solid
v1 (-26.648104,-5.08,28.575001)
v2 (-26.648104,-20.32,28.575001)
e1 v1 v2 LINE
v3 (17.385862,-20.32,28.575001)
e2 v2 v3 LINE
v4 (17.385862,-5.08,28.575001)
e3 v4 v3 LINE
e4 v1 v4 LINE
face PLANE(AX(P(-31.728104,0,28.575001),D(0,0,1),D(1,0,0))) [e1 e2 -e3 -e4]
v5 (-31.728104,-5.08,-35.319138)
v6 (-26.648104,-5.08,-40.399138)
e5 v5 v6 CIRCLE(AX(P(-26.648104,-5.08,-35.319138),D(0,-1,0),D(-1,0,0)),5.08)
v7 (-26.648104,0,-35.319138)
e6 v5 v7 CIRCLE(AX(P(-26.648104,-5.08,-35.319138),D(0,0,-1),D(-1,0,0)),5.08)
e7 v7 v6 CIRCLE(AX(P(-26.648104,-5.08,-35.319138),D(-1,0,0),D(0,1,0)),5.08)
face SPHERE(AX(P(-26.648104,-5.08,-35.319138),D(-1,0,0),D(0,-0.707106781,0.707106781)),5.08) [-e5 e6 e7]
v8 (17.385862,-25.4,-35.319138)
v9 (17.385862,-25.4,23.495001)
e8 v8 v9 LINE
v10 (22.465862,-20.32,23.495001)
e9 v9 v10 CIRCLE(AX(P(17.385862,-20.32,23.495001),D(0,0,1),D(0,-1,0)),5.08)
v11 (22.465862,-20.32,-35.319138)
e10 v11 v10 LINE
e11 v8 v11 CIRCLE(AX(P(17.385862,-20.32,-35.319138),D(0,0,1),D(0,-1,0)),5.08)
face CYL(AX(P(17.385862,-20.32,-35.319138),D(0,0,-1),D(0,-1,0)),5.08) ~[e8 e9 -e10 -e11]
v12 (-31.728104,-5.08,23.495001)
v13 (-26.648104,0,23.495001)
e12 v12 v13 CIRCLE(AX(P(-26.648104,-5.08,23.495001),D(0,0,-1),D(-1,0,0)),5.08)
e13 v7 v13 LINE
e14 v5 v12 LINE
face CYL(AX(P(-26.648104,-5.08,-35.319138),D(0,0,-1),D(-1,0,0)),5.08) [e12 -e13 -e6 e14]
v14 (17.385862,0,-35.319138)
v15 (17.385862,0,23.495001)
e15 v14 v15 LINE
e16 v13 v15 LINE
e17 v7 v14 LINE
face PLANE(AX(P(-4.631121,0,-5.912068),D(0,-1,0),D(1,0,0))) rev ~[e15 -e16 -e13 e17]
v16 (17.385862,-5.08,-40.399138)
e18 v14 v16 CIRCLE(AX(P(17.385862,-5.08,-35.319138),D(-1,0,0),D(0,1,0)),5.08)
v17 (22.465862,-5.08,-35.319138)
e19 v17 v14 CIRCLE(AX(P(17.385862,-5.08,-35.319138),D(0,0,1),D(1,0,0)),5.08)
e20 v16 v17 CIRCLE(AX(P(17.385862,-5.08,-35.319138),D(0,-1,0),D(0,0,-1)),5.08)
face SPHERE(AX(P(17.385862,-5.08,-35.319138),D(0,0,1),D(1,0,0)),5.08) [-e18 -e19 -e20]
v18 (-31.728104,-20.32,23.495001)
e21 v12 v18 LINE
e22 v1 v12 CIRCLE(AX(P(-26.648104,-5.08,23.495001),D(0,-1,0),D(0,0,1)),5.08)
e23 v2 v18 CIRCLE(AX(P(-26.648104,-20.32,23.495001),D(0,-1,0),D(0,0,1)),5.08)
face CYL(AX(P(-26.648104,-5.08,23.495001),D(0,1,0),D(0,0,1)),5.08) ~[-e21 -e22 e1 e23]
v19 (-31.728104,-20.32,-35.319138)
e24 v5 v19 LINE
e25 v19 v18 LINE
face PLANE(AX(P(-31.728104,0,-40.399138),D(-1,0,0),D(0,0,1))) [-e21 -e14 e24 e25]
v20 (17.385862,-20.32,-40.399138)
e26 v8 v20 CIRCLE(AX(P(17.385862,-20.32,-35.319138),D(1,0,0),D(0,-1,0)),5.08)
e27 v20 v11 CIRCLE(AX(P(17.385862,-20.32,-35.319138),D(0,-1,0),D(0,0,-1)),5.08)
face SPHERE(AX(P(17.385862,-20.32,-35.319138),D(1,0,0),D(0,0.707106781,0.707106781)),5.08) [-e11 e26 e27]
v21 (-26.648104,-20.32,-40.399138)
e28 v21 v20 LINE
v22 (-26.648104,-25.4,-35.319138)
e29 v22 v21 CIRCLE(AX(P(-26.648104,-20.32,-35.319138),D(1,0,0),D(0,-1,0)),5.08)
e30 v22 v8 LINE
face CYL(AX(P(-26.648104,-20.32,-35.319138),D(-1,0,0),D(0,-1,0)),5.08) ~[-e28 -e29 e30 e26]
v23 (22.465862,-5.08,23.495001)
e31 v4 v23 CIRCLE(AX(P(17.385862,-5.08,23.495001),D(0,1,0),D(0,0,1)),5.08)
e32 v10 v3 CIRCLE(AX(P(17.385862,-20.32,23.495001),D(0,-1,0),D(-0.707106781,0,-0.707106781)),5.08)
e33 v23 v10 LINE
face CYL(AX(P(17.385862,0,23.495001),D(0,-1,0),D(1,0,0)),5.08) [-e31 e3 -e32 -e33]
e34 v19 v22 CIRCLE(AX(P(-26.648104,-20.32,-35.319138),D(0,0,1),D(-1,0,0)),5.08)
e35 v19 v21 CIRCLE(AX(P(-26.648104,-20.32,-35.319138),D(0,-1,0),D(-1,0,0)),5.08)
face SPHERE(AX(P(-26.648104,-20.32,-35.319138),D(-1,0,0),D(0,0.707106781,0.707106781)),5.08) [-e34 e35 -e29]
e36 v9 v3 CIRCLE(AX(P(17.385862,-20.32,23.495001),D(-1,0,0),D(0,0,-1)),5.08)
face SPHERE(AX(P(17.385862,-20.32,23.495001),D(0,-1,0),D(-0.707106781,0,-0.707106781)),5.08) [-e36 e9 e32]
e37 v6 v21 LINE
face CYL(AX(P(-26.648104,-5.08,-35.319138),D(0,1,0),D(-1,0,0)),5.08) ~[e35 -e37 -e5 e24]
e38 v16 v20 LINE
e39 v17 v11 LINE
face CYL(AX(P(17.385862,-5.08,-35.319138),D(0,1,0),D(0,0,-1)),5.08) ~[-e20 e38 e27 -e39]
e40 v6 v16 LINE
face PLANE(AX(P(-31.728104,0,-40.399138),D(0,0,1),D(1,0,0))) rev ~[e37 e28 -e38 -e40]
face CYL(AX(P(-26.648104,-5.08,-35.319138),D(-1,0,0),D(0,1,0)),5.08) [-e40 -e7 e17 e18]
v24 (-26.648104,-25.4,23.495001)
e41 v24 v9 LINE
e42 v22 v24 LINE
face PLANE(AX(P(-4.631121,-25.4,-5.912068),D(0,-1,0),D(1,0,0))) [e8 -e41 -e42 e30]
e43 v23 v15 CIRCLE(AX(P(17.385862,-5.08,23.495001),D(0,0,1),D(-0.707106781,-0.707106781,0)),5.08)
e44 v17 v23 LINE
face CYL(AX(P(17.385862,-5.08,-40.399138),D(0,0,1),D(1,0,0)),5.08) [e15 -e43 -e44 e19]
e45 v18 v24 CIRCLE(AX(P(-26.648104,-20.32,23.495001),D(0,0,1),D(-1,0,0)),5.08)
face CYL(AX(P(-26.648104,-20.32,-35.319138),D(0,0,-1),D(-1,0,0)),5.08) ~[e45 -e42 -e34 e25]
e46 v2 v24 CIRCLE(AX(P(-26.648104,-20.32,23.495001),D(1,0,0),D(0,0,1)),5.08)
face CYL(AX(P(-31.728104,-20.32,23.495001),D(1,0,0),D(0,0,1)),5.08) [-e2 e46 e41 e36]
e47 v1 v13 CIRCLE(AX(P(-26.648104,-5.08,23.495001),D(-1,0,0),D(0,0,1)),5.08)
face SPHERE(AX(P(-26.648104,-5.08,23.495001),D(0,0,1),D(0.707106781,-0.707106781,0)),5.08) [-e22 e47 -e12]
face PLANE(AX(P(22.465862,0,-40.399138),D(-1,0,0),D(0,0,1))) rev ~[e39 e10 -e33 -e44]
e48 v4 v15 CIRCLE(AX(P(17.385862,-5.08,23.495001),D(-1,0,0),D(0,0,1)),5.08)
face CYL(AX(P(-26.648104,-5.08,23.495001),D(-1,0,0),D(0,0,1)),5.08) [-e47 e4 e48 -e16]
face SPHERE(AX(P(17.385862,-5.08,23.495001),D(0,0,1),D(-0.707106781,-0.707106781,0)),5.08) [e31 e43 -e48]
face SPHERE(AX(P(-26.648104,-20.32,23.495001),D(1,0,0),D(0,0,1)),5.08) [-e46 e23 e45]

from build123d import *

# Parameters (mm, degrees)
F0_W         = 54.1939660907
F0_H         = 68.9741391689
F1_DEPTH     = 25.4
F2_R         = 5.08
F3_T1_DEPTH  = 58.8141391689
F3_T3_DEPTH  = 44.0339660907
F3_T5_DEPTH  = 15.24
F3_S9_W      = 5.08
F3_S9_H      = 5.08
F3_T10_DEPTH = 5.08
F3_S15_W     = 5.08
F3_S15_H     = 5.08
F3_T16_DEPTH = 5.08
F3_S21_W     = 5.08
F3_S21_H     = 5.08
F3_T22_DEPTH = 5.08
F3_S27_W     = 5.08
F3_S27_H     = 5.08
F3_T28_DEPTH = 5.08
F3_S33_W     = 5.08
F3_S33_H     = 5.08
F3_T34_DEPTH = 5.08
F3_S39_W     = 5.08
F3_S39_H     = 5.08
F3_T40_DEPTH = 5.08
F3_T44_ANGLE = 90
F3_T46_ANGLE = 90


# Not quite as in the source:
# - a fillet or chamfer that OpenCascade refuses, or shapes differently, is made with other operations: its cross-section is extruded or revolved along the edge and cut away or added


with BuildPart() as f1:
    # F0 (on Front) → F1 (new body)
    with BuildSketch(Plane.XZ):
        with Locations((-4.6311207116, -5.9120682999)):
            Rectangle(F0_W, F0_H)
    extrude(amount=F1_DEPTH)

    # F2
    f2_edges = [f1.edges().sort_by_distance(p)[0] for p in [
        (22.465862, -12.7, 28.575001),
        (22.465862, 0, -5.912068),
        (-4.631121, -25.4, 28.575001),
    ]]
    fillet(f2_edges, radius=F2_R)

    # F3: fillet of radius 5.08 on 8 edges, made by hand

    # F3_s2 → F3_t1 (cut)
    with BuildSketch(Plane.XY.offset(-35.3191378844)):
        with BuildLine():
            ThreePointArc((17.3858623338, -25.4), (20.9779647822, -23.9121024484), (22.4658623338, -20.32))
            Line((22.4658623338, -20.32), (22.4658623338, -25.4))
            Line((22.4658623338, -25.4), (17.3858623338, -25.4))
        make_face()
        with BuildLine():
            ThreePointArc((-31.7281037569, -5.08), (-30.2402062053, -1.4878975516), (-26.6481037569, 0))
            Line((-26.6481037569, 0), (-31.7281037569, 0))
            Line((-31.7281037569, 0), (-31.7281037569, -5.08))
        make_face()
        with BuildLine():
            ThreePointArc((-31.7281037569, -20.32), (-30.2402062053, -23.9121024484), (-26.6481037569, -25.4))
            Line((-26.6481037569, -25.4), (-31.7281037569, -25.4))
            Line((-31.7281037569, -25.4), (-31.7281037569, -20.32))
        make_face()
    extrude(amount=F3_T1_DEPTH, mode=Mode.SUBTRACT)

    # F3_s4 → F3_t3 (cut)
    with BuildSketch(Plane.YZ.offset(-26.6481037569)):
        with BuildLine():
            ThreePointArc((-5.08, 28.5750012845), (-1.4878975516, 27.0871037329), (0, 23.4950012845))
            Line((0, 23.4950012845), (0, 28.5750012845))
            Line((0, 28.5750012845), (-5.08, 28.5750012845))
        make_face()
        with BuildLine():
            ThreePointArc((-25.4, -35.3191378844), (-23.9121024484, -38.9112403328), (-20.32, -40.3991378844))
            Line((-20.32, -40.3991378844), (-25.4, -40.3991378844))
            Line((-25.4, -40.3991378844), (-25.4, -35.3191378844))
        make_face()
        with BuildLine():
            ThreePointArc((0, -35.3191378844), (-1.4878975516, -38.9112403328), (-5.08, -40.3991378844))
            Line((-5.08, -40.3991378844), (0, -40.3991378844))
            Line((0, -40.3991378844), (0, -35.3191378844))
        make_face()
    extrude(amount=F3_T3_DEPTH, mode=Mode.SUBTRACT)

    # F3_s6 → F3_t5 (cut)
    with BuildSketch(Plane.XZ.offset(5.08)):
        with BuildLine():
            ThreePointArc((-26.6481037569, 28.5750012845), (-30.2402062053, 27.0871037329), (-31.7281037569, 23.4950012845))
            Line((-31.7281037569, 23.4950012845), (-31.7281037569, 28.5750012845))
            Line((-31.7281037569, 28.5750012845), (-26.6481037569, 28.5750012845))
        make_face()
        with BuildLine():
            ThreePointArc((17.3858623338, -40.3991378844), (20.9779647822, -38.9112403328), (22.4658623338, -35.3191378844))
            Line((22.4658623338, -35.3191378844), (22.4658623338, -40.3991378844))
            Line((22.4658623338, -40.3991378844), (17.3858623338, -40.3991378844))
        make_face()
        with BuildLine():
            ThreePointArc((-31.7281037569, -35.3191378844), (-30.2402062053, -38.9112403328), (-26.6481037569, -40.3991378844))
            Line((-26.6481037569, -40.3991378844), (-31.7281037569, -40.3991378844))
            Line((-31.7281037569, -40.3991378844), (-31.7281037569, -35.3191378844))
        make_face()
    extrude(amount=F3_T5_DEPTH, mode=Mode.SUBTRACT)


with BuildPart() as f3_tool8:
    # F3_s9 → F3_t10 (new body)
    with BuildSketch(Plane.XY.offset(23.4950012845)):
        with Locations((19.9258623338, -2.54)):
            Rectangle(F3_S9_W, F3_S9_H)
    extrude(amount=F3_T10_DEPTH)

    # F3_s11 → F3_t12 (revolve, cut)
    with BuildSketch(Plane(origin=(17.3858623338, -5.08, 23.4950012845), x_dir=(-0.7071067812, -0.7071067812, 0), z_dir=(-0.7071067812, 0.7071067812, 0))):
        with BuildLine():
            ThreePointArc((0, -5.08), (5.08, 0), (0, 5.08))
            Line((0, 5.08), (0, -5.08))
        make_face()
    revolve(axis=Axis((17.3858623338, -5.08, 23.4950012845), (0, 0, 1)), mode=Mode.SUBTRACT)


with BuildPart() as f1_1:
    add(f1.part)

    # F3_t7: cut F3_tool8
    add(f3_tool8.part, mode=Mode.SUBTRACT)


with BuildPart() as f3_tool14:
    # F3_s15 → F3_t16 (new body)
    with BuildSketch(Plane.XZ.offset(20.32)):
        with Locations((19.9258623338, 26.0350012845)):
            Rectangle(F3_S15_W, F3_S15_H)
    extrude(amount=F3_T16_DEPTH)

    # F3_s17 → F3_t18 (revolve, cut)
    with BuildSketch(Plane(origin=(17.3858623338, -20.32, 23.4950012845), x_dir=(-0.7071067812, 0, -0.7071067812), z_dir=(-0.7071067812, 0, 0.7071067812))):
        with BuildLine():
            ThreePointArc((0, -5.08), (5.08, 0), (0, 5.08))
            Line((0, 5.08), (0, -5.08))
        make_face()
    revolve(axis=Axis((17.3858623338, -20.32, 23.4950012845), (0, -1, 0)), mode=Mode.SUBTRACT)


with BuildPart() as f1_2:
    add(f1_1.part)

    # F3_t13: cut F3_tool14
    add(f3_tool14.part, mode=Mode.SUBTRACT)


with BuildPart() as f3_tool20:
    # F3_s21 → F3_t22 (new body)
    with BuildSketch(Plane.YZ.offset(17.3858623338)):
        with Locations((-22.86, -37.8591378844)):
            Rectangle(F3_S21_W, F3_S21_H)
    extrude(amount=F3_T22_DEPTH)

    # F3_s23 → F3_t24 (revolve, cut)
    with BuildSketch(Plane(origin=(17.3858623338, -20.32, -35.3191378844), x_dir=(0, 0.7071067812, 0.7071067812), z_dir=(0, 0.7071067812, -0.7071067812))):
        with BuildLine():
            ThreePointArc((0, -5.08), (5.08, 0), (0, 5.08))
            Line((0, 5.08), (0, -5.08))
        make_face()
    revolve(axis=Axis((17.3858623338, -20.32, -35.3191378844), (1, 0, 0)), mode=Mode.SUBTRACT)


with BuildPart() as f1_3:
    add(f1_2.part)

    # F3_t19: cut F3_tool20
    add(f3_tool20.part, mode=Mode.SUBTRACT)


with BuildPart() as f3_tool26:
    # F3_s27 → F3_t28 (new body)
    with BuildSketch(Plane.XY.offset(23.4950012845)):
        with Locations((-29.1881037569, -2.54)):
            Rectangle(F3_S27_W, F3_S27_H)
    extrude(amount=F3_T28_DEPTH)

    # F3_s29 → F3_t30 (revolve, cut)
    with BuildSketch(Plane(origin=(-26.6481037569, -5.08, 23.4950012845), x_dir=(0.7071067812, -0.7071067812, 0), z_dir=(-0.7071067812, -0.7071067812, 0))):
        with BuildLine():
            ThreePointArc((0, -5.08), (5.08, 0), (0, 5.08))
            Line((0, 5.08), (0, -5.08))
        make_face()
    revolve(axis=Axis((-26.6481037569, -5.08, 23.4950012845), (0, 0, 1)), mode=Mode.SUBTRACT)


with BuildPart() as f1_4:
    add(f1_3.part)

    # F3_t25: cut F3_tool26
    add(f3_tool26.part, mode=Mode.SUBTRACT)


with BuildPart() as f3_tool32:
    # F3_s33 → F3_t34 (new body)
    with BuildSketch(Plane.YZ.offset(-26.6481037569)):
        with Locations((-2.54, -37.8591378844)):
            Rectangle(F3_S33_W, F3_S33_H)
    extrude(amount=-F3_T34_DEPTH)

    # F3_s35 → F3_t36 (revolve, cut)
    with BuildSketch(Plane(origin=(-26.6481037569, -5.08, -35.3191378844), x_dir=(0, -0.7071067812, 0.7071067812), z_dir=(0, -0.7071067812, -0.7071067812))):
        with BuildLine():
            ThreePointArc((0, -5.08), (5.08, 0), (0, 5.08))
            Line((0, 5.08), (0, -5.08))
        make_face()
    revolve(axis=Axis((-26.6481037569, -5.08, -35.3191378844), (-1, 0, 0)), mode=Mode.SUBTRACT)


with BuildPart() as f1_5:
    add(f1_4.part)

    # F3_t31: cut F3_tool32
    add(f3_tool32.part, mode=Mode.SUBTRACT)


with BuildPart() as f3_tool38:
    # F3_s39 → F3_t40 (new body)
    with BuildSketch(Plane.YZ.offset(-26.6481037569)):
        with Locations((-22.86, -37.8591378844)):
            Rectangle(F3_S39_W, F3_S39_H)
    extrude(amount=-F3_T40_DEPTH)

    # F3_s41 → F3_t42 (revolve, cut)
    with BuildSketch(Plane(origin=(-26.6481037569, -20.32, -35.3191378844), x_dir=(0, 0.7071067812, 0.7071067812), z_dir=(0, -0.7071067812, 0.7071067812))):
        with BuildLine():
            ThreePointArc((0, -5.08), (5.08, 0), (0, 5.08))
            Line((0, 5.08), (0, -5.08))
        make_face()
    revolve(axis=Axis((-26.6481037569, -20.32, -35.3191378844), (-1, 0, 0)), mode=Mode.SUBTRACT)


with BuildPart() as f1_6:
    add(f1_5.part)

    # F3_t37: cut F3_tool38
    add(f3_tool38.part, mode=Mode.SUBTRACT)

    # F3_s43 → F3_t44 (revolve, cut)
    with BuildSketch(Plane.XZ.offset(5.08)):
        with BuildLine():
            ThreePointArc((17.3858623338, -40.3991378844), (20.9779647822, -38.9112403328), (22.4658623338, -35.3191378844))
            Line((22.4658623338, -35.3191378844), (22.4658623338, -40.3991378844))
            Line((22.4658623338, -40.3991378844), (17.3858623338, -40.3991378844))
        make_face()
    revolve(axis=Axis((17.3858623338, -5.08, -40.3991378844), (0, 0, 1)), revolution_arc=F3_T44_ANGLE, mode=Mode.SUBTRACT)

    # F3_s45 → F3_t46 (revolve, cut)
    with BuildSketch(Plane.XZ.offset(20.32)):
        with BuildLine():
            ThreePointArc((-31.7281037569, 23.4950012845), (-30.2402062053, 27.0871037329), (-26.6481037569, 28.5750012845))
            Line((-26.6481037569, 28.5750012845), (-31.7281037569, 28.5750012845))
            Line((-31.7281037569, 28.5750012845), (-31.7281037569, 23.4950012845))
        make_face()
    revolve(axis=Axis((-31.7281037569, -20.32, 23.4950012845), (1, 0, 0)), revolution_arc=F3_T46_ANGLE, mode=Mode.SUBTRACT)


solid = f1_6.part
